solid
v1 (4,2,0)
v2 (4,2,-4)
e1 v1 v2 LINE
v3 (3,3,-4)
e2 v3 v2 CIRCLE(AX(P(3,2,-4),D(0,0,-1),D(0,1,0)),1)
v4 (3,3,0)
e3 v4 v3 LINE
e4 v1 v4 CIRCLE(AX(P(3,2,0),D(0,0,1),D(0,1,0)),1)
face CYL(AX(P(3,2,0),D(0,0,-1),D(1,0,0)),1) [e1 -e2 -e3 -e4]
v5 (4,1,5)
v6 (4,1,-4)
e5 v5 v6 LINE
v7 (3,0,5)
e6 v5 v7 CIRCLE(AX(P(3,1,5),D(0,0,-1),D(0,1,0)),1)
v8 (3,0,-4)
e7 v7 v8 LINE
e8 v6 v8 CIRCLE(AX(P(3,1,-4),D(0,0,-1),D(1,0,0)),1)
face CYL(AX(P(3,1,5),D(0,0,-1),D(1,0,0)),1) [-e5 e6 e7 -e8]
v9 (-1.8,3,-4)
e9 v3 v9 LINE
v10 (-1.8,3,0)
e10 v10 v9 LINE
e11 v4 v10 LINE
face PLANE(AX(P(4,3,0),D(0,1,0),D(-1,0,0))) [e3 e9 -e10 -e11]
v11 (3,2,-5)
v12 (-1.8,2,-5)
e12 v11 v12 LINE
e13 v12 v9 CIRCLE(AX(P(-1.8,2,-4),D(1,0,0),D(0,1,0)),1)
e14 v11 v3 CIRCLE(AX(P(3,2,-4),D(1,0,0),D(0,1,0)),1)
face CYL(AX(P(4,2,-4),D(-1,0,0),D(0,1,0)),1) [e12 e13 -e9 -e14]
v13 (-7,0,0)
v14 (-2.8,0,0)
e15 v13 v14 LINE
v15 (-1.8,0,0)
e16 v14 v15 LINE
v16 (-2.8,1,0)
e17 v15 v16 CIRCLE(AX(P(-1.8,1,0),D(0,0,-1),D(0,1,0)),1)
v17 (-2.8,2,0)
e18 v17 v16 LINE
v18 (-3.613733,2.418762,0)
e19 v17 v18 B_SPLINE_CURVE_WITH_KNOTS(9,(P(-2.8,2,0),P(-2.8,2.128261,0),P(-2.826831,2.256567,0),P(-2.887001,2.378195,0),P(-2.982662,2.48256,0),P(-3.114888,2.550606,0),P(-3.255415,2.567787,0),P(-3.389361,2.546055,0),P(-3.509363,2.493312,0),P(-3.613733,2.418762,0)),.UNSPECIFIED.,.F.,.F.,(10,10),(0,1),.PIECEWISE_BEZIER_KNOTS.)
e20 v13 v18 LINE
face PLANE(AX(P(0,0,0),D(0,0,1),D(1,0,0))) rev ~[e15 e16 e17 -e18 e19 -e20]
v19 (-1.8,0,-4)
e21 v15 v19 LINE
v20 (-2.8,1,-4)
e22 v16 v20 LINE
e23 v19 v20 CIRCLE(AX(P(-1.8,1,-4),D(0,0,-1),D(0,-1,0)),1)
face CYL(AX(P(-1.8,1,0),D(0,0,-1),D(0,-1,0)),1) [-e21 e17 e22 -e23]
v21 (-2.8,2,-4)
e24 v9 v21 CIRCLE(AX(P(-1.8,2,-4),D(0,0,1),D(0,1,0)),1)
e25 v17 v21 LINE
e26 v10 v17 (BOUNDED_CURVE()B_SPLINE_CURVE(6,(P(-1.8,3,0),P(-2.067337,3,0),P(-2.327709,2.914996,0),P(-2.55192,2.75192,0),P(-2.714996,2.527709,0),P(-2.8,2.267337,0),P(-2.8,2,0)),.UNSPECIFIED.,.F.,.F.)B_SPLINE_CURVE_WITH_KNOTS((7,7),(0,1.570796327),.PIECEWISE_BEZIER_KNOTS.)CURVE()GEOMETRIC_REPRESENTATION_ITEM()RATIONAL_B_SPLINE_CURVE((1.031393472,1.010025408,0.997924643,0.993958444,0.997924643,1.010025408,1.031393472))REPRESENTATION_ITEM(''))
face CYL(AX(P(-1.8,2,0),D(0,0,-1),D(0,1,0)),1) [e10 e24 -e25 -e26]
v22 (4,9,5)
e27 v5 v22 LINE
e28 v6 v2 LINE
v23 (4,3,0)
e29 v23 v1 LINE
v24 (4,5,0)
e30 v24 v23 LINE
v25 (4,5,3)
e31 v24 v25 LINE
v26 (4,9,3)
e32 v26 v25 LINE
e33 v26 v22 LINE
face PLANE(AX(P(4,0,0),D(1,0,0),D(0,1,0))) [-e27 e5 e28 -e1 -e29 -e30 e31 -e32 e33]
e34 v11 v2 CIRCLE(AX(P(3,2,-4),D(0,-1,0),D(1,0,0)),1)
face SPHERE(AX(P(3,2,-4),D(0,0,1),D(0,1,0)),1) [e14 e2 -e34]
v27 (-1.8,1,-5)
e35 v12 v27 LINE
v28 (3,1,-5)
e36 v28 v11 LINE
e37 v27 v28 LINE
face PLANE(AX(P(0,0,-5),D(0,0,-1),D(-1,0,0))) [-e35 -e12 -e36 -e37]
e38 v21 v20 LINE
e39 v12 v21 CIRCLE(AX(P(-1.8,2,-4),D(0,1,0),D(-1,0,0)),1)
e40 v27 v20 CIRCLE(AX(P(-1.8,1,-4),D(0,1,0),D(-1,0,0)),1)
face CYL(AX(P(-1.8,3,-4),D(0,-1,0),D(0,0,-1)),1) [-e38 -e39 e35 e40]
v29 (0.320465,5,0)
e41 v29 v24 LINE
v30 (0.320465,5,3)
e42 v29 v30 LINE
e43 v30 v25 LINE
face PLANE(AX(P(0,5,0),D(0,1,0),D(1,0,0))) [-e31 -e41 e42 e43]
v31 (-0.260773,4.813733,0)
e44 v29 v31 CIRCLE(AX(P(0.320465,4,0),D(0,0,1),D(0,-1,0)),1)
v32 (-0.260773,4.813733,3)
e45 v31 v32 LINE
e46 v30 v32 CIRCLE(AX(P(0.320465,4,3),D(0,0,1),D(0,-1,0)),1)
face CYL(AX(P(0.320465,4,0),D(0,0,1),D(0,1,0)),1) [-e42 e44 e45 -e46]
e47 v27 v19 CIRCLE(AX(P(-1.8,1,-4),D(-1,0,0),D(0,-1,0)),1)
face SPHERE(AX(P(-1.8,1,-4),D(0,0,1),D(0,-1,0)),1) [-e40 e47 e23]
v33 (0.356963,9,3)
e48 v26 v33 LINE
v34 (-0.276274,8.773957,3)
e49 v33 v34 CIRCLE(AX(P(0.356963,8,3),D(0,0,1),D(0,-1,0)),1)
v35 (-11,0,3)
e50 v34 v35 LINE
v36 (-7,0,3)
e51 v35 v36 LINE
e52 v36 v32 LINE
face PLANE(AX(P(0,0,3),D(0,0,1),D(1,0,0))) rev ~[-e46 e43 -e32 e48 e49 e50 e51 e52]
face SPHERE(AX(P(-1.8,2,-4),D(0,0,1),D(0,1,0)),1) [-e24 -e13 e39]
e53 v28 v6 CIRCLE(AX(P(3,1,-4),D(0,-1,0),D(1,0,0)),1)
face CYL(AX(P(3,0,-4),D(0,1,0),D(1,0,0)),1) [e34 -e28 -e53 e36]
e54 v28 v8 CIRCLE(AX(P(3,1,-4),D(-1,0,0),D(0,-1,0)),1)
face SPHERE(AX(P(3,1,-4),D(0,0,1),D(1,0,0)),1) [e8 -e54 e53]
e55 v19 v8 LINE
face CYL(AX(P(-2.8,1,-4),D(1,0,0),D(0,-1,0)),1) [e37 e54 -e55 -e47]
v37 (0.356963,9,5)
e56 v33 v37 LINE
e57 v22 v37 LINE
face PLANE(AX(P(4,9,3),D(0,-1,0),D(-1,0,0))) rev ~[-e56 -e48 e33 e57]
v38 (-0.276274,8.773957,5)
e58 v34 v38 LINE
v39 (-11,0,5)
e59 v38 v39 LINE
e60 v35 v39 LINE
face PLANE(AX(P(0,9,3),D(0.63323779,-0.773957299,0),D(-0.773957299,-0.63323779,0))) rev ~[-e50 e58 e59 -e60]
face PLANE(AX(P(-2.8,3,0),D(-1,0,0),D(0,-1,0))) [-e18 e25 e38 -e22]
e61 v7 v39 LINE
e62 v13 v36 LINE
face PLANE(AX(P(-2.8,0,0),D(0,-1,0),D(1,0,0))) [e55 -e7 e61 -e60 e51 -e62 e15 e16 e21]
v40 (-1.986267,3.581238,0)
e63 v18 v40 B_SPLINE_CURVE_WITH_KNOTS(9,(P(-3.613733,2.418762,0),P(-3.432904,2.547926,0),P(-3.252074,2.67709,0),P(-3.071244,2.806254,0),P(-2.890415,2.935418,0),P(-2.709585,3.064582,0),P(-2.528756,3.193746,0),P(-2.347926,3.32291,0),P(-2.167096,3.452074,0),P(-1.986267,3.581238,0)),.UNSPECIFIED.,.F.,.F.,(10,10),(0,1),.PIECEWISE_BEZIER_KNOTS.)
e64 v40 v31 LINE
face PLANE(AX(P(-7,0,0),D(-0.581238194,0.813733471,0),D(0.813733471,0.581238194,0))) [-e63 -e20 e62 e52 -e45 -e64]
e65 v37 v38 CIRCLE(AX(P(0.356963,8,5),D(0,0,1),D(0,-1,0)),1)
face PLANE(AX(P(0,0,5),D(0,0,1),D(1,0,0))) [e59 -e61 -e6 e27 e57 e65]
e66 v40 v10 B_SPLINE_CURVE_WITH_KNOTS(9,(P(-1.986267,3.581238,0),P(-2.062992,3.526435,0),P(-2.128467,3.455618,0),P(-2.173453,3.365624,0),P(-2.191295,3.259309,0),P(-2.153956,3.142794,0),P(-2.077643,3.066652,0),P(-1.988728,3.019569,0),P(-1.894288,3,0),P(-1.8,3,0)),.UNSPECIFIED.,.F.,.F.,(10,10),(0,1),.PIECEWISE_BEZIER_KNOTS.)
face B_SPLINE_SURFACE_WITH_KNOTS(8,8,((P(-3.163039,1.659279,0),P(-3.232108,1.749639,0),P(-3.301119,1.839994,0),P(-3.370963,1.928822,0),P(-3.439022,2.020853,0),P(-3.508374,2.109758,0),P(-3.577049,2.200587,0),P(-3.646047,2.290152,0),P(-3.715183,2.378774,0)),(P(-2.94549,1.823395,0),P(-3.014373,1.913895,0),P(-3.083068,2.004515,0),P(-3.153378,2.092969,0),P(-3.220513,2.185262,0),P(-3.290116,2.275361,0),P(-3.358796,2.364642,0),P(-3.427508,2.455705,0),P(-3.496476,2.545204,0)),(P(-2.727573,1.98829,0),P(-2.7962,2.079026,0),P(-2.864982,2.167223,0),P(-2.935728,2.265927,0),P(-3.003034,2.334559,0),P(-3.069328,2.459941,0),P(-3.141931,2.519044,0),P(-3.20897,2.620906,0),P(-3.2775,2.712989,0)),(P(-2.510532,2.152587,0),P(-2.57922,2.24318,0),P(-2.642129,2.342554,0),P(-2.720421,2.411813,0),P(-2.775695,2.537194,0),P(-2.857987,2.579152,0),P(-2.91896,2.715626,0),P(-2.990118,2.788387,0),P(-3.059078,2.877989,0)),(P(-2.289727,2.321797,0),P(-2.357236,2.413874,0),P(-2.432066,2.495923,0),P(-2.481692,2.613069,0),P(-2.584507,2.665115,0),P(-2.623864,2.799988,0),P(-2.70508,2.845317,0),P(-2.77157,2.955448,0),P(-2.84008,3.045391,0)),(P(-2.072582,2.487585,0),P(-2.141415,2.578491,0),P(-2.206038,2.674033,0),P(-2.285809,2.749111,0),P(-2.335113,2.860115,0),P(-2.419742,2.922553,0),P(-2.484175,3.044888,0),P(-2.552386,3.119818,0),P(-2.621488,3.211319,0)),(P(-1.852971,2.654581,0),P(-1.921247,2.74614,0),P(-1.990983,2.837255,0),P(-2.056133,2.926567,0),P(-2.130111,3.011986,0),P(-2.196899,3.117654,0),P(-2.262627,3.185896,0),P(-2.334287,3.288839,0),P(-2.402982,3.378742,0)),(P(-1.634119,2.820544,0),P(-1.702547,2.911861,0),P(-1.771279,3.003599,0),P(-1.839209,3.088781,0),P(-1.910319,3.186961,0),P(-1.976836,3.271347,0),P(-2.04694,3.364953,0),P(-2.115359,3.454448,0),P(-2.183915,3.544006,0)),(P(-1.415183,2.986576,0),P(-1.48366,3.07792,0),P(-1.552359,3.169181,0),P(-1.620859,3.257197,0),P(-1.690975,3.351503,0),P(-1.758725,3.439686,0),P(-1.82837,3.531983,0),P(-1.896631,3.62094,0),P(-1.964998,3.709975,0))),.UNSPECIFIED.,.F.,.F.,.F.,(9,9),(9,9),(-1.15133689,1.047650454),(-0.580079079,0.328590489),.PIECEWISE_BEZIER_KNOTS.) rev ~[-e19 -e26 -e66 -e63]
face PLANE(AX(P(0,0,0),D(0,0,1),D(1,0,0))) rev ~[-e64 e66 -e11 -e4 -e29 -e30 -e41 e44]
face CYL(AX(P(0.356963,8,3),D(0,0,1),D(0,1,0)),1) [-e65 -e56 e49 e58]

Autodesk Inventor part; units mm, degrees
ref_plane "YZ Plane" through (0, 0, 0) normal (1, 0, 0) x (0, 1, 0)
ref_plane "XZ Plane" through (0, 0, 0) normal (0, 1, 0) x (-1, 0, 0)
ref_plane "XY Plane" through (0, 0, 0) normal (0, 0, 1) x (1, 0, 0)
sketch "Эскиз1" plane through (0, 0, 0) normal (0, 0, 1) x (1, 0, 0)
  line L0 (0, 0) -> (0, 5)
  line L1 (0, 0) -> (-7, 0)
  line L2 (-7, 0) -> (0, 5)
  line L3 (0, 5) -> (4, 5)
  line L4 (4, 5) -> (4, 0)
  line L5 (4, 0) -> (0, 0)
  dimension "d0" = 5
  dimension "d1" = 7
  dimension "d2" = 4
extrude "Выдавливание1" add sketch "Эскиз1" along normal blind 3
sketch "Эскиз2" plane through (0, 0, 3) normal (0, 0, 1) x (1, 0, 0)
  line L0 (-7, 0) -> (4, 0) projected
  line L1 (-7, 0) -> (-11, 0)
  line L2 (4, 5) -> (0, 5) projected
  line L3 (0, 5) -> (0, 9)
  line L4 (0, 9) -> (-11, 0)
  line L5 (4, 5) -> (4, 9)
  line L6 (4, 9) -> (0, 9)
  line L7 (4, 0) -> (4, 5) projected
  line L8 (4, 5) -> (4, 0)
  line L9 (4, 0) -> (-7, 0)
  point P0 (0, 0)
  dimension "d5" = 4
  dimension "d6" = 4
extrude "Выдавливание2" add sketch "Эскиз2" along normal blind 2
sketch "Эскиз3" plane through (0, 0, 0) normal (0, 0, -1) x (-1, 0, 0)
  line L0 (-4, 0) -> (-4, 5) projected
  line L1 (-4, 0) -> (-4, 3)
  line L2 (-4, 3) -> (2.8, 3)
  line L3 (0, 5) -> (7, 0) projected
  line L4 (7, 0) -> (-4, 0) projected
  line L5 (2.8, 3) -> (7, 0)
  line L6 (7, 0) -> (-4, 0)
  line L7 (2.8, 3) -> (2.8, 0)
  point P0 (0, 0)
  dimension "d9" = 3
extrude "Выдавливание3" add sketch "Эскиз3" along normal blind 5 contours L0 L2 L7 L4
fillet "Сопряжение1" radius 1 10 edges at (4, 3, -2.5) (4, 0, 0) (-2.8, 0, -2.5) (-2.8, 3, -2.5) (0, 5, 1.5) (0, 9, 4) (0.6, 3, -5) (4, 1.5, -5) (0.6, 0, -5) (-2.8, 1.5, -5)
properties part number "разделитель"
